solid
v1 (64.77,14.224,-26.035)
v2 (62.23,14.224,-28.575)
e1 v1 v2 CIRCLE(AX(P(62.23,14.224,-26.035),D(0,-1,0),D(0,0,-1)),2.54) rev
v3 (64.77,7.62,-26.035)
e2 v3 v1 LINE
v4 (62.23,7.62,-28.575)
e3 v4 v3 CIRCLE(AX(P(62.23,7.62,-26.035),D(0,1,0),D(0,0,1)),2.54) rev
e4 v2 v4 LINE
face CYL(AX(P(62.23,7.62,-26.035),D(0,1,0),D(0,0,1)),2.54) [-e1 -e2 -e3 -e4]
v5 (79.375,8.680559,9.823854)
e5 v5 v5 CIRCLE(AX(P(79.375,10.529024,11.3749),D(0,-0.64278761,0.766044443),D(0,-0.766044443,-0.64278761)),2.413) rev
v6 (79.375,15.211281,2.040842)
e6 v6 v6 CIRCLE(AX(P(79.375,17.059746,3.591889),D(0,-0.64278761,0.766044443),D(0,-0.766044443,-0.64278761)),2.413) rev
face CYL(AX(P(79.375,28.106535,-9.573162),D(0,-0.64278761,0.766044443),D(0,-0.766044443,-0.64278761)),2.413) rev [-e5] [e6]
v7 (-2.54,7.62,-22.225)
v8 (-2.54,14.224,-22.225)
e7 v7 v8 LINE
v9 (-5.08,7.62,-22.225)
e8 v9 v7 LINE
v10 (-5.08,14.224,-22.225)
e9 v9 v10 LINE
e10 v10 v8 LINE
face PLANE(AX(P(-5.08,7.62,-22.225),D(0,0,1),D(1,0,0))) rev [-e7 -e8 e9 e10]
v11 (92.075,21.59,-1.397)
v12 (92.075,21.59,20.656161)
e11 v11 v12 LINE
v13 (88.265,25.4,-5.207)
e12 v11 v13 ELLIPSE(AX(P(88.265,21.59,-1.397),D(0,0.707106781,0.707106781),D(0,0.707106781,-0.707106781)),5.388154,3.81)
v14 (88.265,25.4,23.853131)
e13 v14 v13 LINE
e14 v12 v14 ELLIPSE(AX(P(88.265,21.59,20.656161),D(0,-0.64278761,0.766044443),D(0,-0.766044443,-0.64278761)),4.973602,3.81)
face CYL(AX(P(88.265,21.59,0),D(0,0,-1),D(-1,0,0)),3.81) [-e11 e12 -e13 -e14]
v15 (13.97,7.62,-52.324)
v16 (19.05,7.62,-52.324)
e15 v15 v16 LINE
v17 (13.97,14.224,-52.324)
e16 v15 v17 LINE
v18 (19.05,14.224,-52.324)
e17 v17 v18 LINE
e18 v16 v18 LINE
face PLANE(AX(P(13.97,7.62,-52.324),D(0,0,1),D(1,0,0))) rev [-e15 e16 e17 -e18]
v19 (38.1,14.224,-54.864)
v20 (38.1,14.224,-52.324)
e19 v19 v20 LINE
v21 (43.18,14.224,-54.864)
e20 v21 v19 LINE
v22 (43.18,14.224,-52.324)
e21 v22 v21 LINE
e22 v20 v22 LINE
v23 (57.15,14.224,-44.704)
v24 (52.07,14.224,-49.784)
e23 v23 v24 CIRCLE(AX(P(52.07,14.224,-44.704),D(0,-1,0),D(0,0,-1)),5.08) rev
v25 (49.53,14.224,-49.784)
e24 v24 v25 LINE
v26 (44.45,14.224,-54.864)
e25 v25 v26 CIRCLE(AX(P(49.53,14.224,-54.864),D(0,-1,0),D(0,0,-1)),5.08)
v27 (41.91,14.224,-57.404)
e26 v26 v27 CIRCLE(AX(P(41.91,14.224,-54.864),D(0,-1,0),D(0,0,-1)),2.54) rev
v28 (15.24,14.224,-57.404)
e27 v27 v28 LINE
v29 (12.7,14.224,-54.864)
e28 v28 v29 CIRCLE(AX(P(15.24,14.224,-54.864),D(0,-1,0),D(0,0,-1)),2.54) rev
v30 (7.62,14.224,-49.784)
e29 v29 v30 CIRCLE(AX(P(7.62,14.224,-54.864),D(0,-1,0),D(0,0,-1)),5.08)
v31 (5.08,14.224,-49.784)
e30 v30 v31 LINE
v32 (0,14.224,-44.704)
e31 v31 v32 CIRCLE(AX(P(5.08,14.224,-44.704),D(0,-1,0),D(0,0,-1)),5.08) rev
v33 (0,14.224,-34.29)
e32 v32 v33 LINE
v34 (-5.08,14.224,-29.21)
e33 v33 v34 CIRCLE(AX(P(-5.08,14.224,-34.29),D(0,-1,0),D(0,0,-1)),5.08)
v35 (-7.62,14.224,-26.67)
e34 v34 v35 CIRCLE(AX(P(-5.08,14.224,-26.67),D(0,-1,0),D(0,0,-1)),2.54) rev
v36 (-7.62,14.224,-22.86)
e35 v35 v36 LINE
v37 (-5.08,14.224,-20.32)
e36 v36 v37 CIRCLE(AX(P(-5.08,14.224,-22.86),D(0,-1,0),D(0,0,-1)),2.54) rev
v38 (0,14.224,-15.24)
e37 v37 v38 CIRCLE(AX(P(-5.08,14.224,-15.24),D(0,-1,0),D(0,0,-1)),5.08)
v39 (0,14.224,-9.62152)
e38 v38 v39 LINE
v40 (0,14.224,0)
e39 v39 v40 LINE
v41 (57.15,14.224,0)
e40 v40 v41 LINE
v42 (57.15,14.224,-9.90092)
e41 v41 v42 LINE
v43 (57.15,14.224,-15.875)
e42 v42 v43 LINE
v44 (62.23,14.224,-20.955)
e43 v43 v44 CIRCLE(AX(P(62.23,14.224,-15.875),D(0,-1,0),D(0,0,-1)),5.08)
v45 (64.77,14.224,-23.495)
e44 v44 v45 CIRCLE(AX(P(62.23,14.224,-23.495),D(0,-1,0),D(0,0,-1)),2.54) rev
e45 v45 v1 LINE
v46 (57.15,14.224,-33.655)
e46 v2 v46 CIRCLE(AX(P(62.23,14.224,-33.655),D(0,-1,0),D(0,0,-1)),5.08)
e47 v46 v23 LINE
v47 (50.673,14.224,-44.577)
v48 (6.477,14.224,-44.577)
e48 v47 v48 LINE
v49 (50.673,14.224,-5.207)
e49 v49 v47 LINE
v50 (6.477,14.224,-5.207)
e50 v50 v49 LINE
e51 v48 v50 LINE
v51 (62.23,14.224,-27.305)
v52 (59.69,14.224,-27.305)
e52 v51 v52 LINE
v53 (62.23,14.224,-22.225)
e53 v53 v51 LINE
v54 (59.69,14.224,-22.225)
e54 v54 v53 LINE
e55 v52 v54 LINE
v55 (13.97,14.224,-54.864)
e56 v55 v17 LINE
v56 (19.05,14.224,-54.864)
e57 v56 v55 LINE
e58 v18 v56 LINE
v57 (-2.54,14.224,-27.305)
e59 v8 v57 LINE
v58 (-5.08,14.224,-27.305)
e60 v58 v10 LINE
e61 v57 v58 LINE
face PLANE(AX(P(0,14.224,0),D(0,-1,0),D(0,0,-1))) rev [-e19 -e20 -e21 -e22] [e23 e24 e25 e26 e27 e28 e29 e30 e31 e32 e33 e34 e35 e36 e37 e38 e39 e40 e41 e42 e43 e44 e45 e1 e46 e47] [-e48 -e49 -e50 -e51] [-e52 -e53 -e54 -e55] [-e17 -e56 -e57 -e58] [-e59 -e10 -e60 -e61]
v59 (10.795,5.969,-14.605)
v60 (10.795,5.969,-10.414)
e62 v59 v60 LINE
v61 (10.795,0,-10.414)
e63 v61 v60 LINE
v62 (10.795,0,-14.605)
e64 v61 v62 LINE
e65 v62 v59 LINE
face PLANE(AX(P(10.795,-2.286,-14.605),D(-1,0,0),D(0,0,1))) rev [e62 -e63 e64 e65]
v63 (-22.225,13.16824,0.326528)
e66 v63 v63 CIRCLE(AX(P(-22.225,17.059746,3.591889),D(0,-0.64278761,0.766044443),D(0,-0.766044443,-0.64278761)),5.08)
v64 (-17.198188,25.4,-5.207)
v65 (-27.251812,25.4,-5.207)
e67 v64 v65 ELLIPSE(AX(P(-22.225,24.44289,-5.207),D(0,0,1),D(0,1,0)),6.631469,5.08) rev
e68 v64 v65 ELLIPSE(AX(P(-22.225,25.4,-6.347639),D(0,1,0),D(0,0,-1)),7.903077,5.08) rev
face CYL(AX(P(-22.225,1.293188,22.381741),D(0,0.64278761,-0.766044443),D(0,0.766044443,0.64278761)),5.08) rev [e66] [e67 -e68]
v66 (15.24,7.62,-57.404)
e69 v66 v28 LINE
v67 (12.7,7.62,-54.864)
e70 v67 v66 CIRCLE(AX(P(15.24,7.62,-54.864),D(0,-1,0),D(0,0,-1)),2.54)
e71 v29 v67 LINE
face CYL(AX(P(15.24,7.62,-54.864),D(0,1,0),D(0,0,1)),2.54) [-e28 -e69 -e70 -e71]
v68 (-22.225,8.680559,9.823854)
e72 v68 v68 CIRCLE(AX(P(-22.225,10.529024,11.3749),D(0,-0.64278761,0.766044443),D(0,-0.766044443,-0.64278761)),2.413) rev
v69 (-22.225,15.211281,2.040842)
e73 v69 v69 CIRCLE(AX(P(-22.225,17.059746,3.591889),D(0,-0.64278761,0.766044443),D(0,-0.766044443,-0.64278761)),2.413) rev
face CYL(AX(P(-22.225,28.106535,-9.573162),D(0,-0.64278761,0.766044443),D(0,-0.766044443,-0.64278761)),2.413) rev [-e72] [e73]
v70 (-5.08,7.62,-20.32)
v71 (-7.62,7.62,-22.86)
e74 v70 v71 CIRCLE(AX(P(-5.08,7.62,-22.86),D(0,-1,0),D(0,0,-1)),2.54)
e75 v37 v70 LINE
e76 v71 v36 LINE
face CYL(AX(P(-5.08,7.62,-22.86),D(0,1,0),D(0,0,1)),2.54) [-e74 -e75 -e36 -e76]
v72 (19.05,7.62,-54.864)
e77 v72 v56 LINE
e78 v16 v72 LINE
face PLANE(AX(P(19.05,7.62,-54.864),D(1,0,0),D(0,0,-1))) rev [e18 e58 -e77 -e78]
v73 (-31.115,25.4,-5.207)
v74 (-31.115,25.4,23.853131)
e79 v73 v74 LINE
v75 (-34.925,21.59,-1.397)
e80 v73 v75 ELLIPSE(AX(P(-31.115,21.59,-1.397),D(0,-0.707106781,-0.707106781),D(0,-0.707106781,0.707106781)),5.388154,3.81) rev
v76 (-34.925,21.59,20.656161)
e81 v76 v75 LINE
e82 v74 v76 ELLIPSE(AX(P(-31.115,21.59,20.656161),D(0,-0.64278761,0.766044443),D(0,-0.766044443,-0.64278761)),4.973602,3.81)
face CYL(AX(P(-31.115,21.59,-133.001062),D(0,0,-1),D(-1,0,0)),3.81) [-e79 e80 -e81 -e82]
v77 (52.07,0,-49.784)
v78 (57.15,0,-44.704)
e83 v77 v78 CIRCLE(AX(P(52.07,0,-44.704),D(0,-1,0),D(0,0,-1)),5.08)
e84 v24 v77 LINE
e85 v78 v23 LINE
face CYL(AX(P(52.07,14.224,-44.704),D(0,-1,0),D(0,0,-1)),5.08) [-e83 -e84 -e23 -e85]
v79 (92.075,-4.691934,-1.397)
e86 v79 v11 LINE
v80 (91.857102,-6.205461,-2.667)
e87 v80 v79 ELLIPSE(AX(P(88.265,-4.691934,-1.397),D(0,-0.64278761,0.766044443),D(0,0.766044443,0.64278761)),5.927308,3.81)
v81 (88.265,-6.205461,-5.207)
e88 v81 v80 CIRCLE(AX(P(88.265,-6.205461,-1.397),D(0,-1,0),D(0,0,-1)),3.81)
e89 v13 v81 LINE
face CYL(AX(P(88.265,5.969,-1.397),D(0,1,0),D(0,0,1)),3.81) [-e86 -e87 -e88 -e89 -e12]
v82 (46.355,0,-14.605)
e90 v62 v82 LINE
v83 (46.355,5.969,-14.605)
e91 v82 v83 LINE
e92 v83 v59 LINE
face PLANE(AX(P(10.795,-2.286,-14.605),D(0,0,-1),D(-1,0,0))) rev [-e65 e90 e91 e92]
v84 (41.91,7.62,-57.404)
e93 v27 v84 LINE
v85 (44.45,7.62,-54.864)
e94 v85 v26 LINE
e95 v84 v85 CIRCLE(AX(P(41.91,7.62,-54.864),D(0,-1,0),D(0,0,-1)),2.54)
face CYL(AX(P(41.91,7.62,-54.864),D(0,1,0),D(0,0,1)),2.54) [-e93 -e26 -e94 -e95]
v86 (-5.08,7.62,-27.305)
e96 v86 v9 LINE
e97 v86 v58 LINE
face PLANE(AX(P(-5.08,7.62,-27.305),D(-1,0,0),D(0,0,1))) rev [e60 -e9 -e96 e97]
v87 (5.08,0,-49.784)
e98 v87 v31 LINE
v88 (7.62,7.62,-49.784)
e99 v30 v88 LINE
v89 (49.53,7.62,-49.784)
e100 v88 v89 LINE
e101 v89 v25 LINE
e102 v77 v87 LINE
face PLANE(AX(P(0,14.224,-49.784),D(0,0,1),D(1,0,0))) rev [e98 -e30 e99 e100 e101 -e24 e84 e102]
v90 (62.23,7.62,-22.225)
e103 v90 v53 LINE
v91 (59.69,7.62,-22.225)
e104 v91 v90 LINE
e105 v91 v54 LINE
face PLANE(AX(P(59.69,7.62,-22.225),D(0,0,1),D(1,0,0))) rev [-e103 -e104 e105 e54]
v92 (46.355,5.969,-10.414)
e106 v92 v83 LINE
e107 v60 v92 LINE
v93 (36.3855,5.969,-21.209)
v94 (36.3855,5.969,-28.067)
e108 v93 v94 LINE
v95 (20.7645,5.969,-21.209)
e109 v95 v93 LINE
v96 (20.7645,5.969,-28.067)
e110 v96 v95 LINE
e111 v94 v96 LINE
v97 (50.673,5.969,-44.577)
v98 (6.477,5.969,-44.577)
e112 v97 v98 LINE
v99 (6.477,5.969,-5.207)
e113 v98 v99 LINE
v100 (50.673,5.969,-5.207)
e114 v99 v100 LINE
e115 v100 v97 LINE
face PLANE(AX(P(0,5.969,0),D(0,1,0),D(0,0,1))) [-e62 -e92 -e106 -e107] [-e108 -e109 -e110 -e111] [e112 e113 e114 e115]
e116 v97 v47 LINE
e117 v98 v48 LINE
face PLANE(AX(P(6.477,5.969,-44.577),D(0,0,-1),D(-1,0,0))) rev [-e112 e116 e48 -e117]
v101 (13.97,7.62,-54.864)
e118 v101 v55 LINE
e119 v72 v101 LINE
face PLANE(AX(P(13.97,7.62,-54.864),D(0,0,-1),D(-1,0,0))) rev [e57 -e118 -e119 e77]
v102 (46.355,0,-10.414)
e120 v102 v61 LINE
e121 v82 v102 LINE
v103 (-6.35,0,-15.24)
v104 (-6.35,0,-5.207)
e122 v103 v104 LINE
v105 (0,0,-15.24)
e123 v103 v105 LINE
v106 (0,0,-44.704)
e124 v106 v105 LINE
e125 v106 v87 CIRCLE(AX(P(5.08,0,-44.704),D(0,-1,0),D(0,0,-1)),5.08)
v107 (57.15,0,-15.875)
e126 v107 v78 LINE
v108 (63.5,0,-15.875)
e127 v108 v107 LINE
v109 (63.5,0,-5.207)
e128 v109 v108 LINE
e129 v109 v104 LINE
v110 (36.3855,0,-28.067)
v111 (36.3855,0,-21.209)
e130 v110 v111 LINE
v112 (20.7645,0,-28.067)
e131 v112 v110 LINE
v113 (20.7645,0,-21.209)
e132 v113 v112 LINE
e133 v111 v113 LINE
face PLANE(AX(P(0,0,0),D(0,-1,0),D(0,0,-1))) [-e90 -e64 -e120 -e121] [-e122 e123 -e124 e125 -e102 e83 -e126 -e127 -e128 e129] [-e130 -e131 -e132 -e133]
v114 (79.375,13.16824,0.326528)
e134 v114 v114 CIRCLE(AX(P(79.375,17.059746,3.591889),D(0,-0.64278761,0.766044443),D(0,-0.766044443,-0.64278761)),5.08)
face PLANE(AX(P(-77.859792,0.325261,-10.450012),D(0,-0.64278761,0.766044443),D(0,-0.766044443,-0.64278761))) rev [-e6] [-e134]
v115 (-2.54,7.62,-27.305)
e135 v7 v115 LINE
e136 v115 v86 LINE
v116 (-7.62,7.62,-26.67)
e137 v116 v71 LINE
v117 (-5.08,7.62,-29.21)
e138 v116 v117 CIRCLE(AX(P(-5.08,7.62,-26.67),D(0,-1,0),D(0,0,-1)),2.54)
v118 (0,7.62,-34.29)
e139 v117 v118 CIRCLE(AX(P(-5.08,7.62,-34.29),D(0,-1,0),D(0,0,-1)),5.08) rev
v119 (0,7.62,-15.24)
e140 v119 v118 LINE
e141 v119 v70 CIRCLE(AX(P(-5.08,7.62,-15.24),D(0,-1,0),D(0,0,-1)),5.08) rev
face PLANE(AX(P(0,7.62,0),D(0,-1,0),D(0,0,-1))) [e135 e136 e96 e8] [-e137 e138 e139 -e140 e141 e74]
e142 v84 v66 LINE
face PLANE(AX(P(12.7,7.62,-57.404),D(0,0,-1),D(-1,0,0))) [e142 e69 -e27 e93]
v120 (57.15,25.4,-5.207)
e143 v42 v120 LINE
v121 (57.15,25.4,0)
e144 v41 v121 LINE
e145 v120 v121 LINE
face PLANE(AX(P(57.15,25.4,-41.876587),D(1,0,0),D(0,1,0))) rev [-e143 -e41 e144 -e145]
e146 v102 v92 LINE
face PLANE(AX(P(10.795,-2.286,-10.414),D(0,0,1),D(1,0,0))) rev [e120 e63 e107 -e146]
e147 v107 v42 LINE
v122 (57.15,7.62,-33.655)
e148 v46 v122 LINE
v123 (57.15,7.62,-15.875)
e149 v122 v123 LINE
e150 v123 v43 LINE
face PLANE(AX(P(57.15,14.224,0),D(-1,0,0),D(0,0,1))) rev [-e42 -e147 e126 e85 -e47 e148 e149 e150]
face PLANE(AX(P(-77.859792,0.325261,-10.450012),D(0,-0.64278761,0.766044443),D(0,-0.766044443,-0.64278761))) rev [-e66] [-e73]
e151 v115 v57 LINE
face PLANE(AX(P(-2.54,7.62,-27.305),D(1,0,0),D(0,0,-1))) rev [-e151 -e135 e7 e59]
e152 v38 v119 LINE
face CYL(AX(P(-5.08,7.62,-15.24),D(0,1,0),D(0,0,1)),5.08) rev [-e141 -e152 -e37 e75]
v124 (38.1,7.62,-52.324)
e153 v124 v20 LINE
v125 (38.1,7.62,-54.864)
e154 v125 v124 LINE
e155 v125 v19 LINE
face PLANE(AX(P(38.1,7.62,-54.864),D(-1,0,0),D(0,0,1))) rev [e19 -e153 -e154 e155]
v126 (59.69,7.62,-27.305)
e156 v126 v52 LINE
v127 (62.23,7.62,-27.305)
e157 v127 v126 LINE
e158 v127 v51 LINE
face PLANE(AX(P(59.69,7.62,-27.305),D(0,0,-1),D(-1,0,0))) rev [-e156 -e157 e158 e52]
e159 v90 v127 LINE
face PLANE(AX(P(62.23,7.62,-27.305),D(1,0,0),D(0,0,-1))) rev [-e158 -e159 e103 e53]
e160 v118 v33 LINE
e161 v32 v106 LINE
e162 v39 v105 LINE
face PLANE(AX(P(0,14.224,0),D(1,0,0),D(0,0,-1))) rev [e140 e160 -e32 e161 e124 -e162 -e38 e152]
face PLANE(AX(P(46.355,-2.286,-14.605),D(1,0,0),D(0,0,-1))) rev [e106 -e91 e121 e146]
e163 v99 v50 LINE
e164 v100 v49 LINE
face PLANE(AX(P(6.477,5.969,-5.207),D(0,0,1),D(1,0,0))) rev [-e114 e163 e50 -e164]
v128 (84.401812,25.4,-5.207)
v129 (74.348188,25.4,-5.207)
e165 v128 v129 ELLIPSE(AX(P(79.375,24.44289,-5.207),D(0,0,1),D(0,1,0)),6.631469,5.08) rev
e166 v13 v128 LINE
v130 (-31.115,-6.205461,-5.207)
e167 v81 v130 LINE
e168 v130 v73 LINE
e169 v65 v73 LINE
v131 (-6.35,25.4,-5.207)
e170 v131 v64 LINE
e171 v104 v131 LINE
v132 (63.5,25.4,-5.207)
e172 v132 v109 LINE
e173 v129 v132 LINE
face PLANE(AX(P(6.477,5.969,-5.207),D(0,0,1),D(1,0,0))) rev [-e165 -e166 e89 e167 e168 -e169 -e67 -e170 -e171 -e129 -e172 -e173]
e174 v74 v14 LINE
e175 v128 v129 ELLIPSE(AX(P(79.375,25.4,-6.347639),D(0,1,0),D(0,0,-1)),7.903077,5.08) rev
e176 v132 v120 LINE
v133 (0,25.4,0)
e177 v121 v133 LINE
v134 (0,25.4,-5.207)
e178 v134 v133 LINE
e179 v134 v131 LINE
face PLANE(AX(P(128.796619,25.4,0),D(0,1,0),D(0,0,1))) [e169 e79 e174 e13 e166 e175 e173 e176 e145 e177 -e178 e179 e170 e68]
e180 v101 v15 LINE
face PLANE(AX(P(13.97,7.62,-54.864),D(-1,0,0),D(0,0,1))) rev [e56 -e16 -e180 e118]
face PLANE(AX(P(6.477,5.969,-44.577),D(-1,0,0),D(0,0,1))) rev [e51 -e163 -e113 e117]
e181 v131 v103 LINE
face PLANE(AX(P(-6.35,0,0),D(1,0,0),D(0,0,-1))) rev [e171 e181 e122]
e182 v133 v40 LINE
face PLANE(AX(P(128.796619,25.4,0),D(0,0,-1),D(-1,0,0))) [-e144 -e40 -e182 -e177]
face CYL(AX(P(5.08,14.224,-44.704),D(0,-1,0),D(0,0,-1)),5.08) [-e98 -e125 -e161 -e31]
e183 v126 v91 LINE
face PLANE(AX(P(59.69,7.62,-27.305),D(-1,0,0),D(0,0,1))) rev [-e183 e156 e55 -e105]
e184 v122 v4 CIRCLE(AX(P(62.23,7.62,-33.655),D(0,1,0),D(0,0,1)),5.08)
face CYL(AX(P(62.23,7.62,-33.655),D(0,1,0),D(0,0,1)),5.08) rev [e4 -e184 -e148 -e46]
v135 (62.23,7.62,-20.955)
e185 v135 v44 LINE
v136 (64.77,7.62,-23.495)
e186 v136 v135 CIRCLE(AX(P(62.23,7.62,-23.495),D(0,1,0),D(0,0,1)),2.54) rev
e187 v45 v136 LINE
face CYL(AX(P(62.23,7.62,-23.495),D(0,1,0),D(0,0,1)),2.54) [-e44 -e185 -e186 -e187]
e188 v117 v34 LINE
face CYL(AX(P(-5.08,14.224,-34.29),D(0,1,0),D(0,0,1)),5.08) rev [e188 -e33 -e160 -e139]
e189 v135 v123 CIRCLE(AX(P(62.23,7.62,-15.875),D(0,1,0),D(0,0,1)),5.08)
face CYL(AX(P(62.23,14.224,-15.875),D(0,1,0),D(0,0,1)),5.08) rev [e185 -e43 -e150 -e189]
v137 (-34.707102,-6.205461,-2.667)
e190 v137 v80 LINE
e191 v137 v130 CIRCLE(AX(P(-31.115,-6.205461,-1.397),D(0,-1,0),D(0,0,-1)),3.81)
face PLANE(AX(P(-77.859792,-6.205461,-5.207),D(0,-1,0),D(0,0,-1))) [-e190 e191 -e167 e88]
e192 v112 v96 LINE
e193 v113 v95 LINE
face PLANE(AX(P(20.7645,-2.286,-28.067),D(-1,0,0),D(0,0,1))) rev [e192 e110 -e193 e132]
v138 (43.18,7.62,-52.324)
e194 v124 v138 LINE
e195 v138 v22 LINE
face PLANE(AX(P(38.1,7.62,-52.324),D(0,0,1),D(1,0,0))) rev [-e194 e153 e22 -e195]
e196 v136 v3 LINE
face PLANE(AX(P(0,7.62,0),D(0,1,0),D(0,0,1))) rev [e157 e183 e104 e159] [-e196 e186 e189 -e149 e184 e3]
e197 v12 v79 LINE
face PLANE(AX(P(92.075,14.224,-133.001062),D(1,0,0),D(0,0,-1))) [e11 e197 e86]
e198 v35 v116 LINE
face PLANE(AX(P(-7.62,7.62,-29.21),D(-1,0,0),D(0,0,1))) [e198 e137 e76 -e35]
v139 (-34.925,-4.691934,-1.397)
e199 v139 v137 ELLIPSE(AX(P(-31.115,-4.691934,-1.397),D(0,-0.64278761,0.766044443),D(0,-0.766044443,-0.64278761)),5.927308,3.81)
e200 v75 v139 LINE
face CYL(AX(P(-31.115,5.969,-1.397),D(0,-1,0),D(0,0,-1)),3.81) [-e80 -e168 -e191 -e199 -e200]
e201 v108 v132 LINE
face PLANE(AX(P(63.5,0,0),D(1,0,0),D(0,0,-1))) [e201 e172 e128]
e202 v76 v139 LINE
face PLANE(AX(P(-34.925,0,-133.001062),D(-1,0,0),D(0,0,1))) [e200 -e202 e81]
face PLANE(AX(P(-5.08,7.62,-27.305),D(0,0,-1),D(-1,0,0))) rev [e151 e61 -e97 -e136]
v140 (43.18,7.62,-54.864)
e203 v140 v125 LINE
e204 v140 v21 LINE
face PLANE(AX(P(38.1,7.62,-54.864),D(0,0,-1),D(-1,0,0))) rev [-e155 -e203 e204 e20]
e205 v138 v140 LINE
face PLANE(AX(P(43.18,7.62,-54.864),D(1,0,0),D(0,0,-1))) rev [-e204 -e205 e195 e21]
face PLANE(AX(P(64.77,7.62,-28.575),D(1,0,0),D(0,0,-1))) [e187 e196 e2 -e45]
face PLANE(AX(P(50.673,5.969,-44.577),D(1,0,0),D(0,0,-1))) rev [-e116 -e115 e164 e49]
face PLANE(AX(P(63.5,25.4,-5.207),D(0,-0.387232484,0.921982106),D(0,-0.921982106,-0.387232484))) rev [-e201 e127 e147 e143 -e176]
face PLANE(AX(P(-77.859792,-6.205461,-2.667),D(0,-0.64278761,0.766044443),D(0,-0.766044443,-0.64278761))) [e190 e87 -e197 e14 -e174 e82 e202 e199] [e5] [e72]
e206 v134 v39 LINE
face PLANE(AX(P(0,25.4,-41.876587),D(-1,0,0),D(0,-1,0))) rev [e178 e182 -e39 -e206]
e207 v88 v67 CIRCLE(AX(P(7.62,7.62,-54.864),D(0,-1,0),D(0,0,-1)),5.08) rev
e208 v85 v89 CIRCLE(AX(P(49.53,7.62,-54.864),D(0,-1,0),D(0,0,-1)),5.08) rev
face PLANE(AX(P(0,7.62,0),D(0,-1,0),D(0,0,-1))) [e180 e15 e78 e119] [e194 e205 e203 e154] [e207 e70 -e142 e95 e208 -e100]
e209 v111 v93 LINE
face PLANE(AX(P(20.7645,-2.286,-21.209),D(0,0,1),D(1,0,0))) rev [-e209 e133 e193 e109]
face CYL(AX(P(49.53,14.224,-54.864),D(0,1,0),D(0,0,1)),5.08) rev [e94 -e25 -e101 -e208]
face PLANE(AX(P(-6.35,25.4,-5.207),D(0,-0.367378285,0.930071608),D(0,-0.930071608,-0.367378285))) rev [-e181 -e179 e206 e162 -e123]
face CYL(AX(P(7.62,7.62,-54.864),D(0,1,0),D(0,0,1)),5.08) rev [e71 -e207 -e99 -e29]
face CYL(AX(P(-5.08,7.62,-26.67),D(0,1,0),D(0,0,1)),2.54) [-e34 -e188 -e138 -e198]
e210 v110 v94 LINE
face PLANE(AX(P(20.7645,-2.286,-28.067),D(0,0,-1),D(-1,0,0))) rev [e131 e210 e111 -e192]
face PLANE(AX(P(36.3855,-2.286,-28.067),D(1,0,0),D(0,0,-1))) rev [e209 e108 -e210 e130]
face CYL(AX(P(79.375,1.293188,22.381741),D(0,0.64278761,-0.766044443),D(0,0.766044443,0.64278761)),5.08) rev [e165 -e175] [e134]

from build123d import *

# Parameters (mm, degrees)
SKETCH2_W           = 57.15
SKETCH2_H           = 49.784
BOSS_EXTRUDE1_DEPTH = 14.224
SKETCH3_W           = 44.196
SKETCH3_H           = 39.37
CUT_EXTRUDE1_DEPTH  = 8.255
SKETCH4_W           = 35.56
SKETCH4_H           = 4.191
SKETCH4_W_2         = 15.621
SKETCH4_H_2         = 6.858
CUT_EXTRUDE2_DEPTH  = 8.255
SKETCH5_W           = 7.62
SKETCH5_H           = 8.89
SKETCH5_H_2         = 7.62
BOSS_EXTRUDE2_DEPTH = 6.604
SKETCH6_W           = 2.54
SKETCH6_H           = 5.08
SKETCH6_W_2         = 5.08
SKETCH6_H_2         = 2.54
CUT_EXTRUDE3_DEPTH  = 6.604
FILLET1_R           = 5.08
FILLET2_R           = 2.54
SKETCH7_W           = 127
SKETCH7_H           = 14.224
SKETCH7_R           = 2.38125
BOSS_EXTRUDE3_DEPTH = 5.207
BOSS_EXTRUDE4_DEPTH = 127
SKETCH11_W          = 34.925
SKETCH11_H          = 11.176
BOSS_EXTRUDE5_DEPTH = 5.207
SKETCH9_R           = 2.413
CUT_EXTRUDE4_DEPTH  = 25.4
FILLET3_R           = 5.08
FILLET4_R           = 5.08
BOSS_EXTRUDE6_DEPTH = 6.35
BOSS_EXTRUDE7_DEPTH = 6.35
BOSS_EXTRUDE8_DEPTH = 127
BOSS_EXTRUDE9_DEPTH = 127
CUT_EXTRUDE6_START  = -1.945752886
SKETCH16_R          = 2.413
CUT_EXTRUDE6_DEPTH  = 1.945752886
CUT_EXTRUDE9_START  = -22.261352
SKETCH17_R          = 5.08
CUT_EXTRUDE9_DEPTH  = 12.101352
FILLET5_R           = 3.81


with BuildPart() as part:
    # Sketch2 → Boss-Extrude1 (new body)
    with BuildSketch(Plane(origin=(0, 0, 0), x_dir=(1, 0, 0), z_dir=(0, 1, 0))):
        with Locations((28.575, 24.892)):
            Rectangle(SKETCH2_W, SKETCH2_H)
    extrude(amount=BOSS_EXTRUDE1_DEPTH)

    # Sketch3 → Cut-Extrude1 (cut)
    with BuildSketch(Plane(origin=(0, 14.224, 0), x_dir=(1, 0, 0), z_dir=(0, 1, 0))):
        with Locations((28.575, 24.892)):
            Rectangle(SKETCH3_W, SKETCH3_H)
    extrude(amount=-CUT_EXTRUDE1_DEPTH, mode=Mode.SUBTRACT)

    # Sketch4 → Cut-Extrude2 (cut)
    with BuildSketch(Plane(origin=(0, 5.969, 0), x_dir=(1, 0, 0), z_dir=(0, 1, 0))):
        with Locations((28.575, 12.5095)):
            Rectangle(SKETCH4_W, SKETCH4_H)
        with Locations((28.575, 24.638)):
            Rectangle(SKETCH4_W_2, SKETCH4_H_2)
    extrude(amount=-CUT_EXTRUDE2_DEPTH, mode=Mode.SUBTRACT)

    # Sketch5 → Boss-Extrude2 (add)
    with BuildSketch(Plane(origin=(0, 14.224, 0), x_dir=(1, 0, 0), z_dir=(0, 1, 0))):
        with Locations((-3.81, 24.765)):
            Rectangle(SKETCH5_W, SKETCH5_H)
        Polygon((12.7, 49.784), (36.83, 49.784), (44.45, 49.784), (44.45, 57.404), (36.83, 57.404), (12.7, 57.404), align=None)
        with Locations((60.96, 24.765)):
            Rectangle(SKETCH5_W, SKETCH5_H_2)
    extrude(amount=-BOSS_EXTRUDE2_DEPTH)

    # Sketch6 → Cut-Extrude3 (cut)
    with BuildSketch(Plane(origin=(0, 14.224, 0), x_dir=(1, 0, 0), z_dir=(0, 1, 0))):
        with Locations((-3.81, 24.765)):
            Rectangle(SKETCH6_W, SKETCH6_H)
        with Locations((60.96, 24.765)):
            Rectangle(SKETCH6_W, SKETCH6_H)
        with Locations((16.51, 53.594)):
            Rectangle(SKETCH6_W_2, SKETCH6_H_2)
        with Locations((40.64, 53.594)):
            Rectangle(SKETCH6_W_2, SKETCH6_H_2)
    extrude(amount=-CUT_EXTRUDE3_DEPTH, mode=Mode.SUBTRACT)

    # Fillet1
    fillet1_edges = [part.edges().sort_by_distance(p)[0] for p in [
        (0, 7.112, -49.784),
        (57.15, 7.112, -49.784),
        (57.15, 7.112, 0),
        (0, 7.112, 0),
    ]]
    fillet(fillet1_edges, radius=FILLET1_R)

    # Fillet2
    fillet2_edges = [part.edges().sort_by_distance(p)[0] for p in [
        (-7.62, 10.922, -20.32),
        (-7.62, 10.922, -29.21),
        (12.7, 10.922, -57.404),
        (44.45, 10.922, -57.404),
        (64.77, 10.922, -28.575),
        (64.77, 10.922, -20.955),
    ]]
    fillet(fillet2_edges, radius=FILLET2_R)

    # Sketch7 → Boss-Extrude3 (add)
    with BuildSketch(Plane.XY):
        with Locations((28.575, 7.112)):
            Rectangle(SKETCH7_W, SKETCH7_H)
        with Locations((-30.861, 7.112)):
            Circle(SKETCH7_R, mode=Mode.SUBTRACT)
        with Locations((88.011, 7.112)):
            Circle(SKETCH7_R, mode=Mode.SUBTRACT)
    extrude(amount=-BOSS_EXTRUDE3_DEPTH)

    # Sketch8 → Boss-Extrude4 (add)
    with BuildSketch(Plane.ZY.offset(34.925)):
        Polygon((0, 25.4), (21.313130632, 25.4), (0, 0), (-5.207, 0), (-5.207, 14.224), (0, 14.224), align=None)
    extrude(amount=-BOSS_EXTRUDE4_DEPTH)

    # Sketch11 → Boss-Extrude5 (add)
    with BuildSketch(Plane(origin=(0, 0, 0), x_dir=(-1, 0, 0), z_dir=(0, 0, -1))):
        with Locations((17.4625, 19.812)):
            Rectangle(SKETCH11_W, SKETCH11_H)
        with Locations((-74.6125, 19.812)):
            Rectangle(SKETCH11_W, SKETCH11_H)
    extrude(amount=BOSS_EXTRUDE5_DEPTH)

    # Sketch9 → Cut-Extrude4 (cut, symmetric)
    with BuildSketch(Plane(origin=(0, 0, 0), x_dir=(1, 0, 0), z_dir=(0, -0.6427876096865434, 0.7660444431189748))):
        with Locations(Location((-22.225, 15.377345149, 0), (0, 0, 270))):
            Circle(SKETCH9_R)
        with Locations(Location((79.375, 15.377345149, 0), (0, 0, 270))):
            Circle(SKETCH9_R)
    extrude(amount=CUT_EXTRUDE4_DEPTH, both=True, mode=Mode.SUBTRACT)

    # Fillet3
    fillet3_edges = [part.edges().sort_by_distance(p)[0] for p in [
        (44.45, 10.922, -49.784),
        (12.7, 10.922, -49.784),
    ]]
    fillet(fillet3_edges, radius=FILLET3_R - 0.0001)  # a hair under: the kernel refuses the full size

    # Fillet4
    fillet4_edges = [part.edges().sort_by_distance(p)[0] for p in [
        (57.15, 10.922, -20.955),
        (57.15, 10.922, -28.575),
        (0, 10.922, -29.21),
        (0, 10.922, -20.32),
    ]]
    fillet(fillet4_edges, radius=FILLET4_R - 0.0001)  # a hair under: the kernel refuses the full size

    # Sketch12 → Boss-Extrude6 (add)
    with BuildSketch(Plane.ZY):
        Polygon((-5.207, 25.4), (-15.24, 0), (-5.207, 0), align=None)
    extrude(amount=BOSS_EXTRUDE6_DEPTH)

    # Sketch13 → Boss-Extrude7 (add)
    with BuildSketch(Plane(origin=(57.15, 0, 0), x_dir=(0, 0, -1), z_dir=(1, 0, 0))):
        Polygon((5.207, 25.4), (15.875, 0), (5.207, 0), align=None)
    extrude(amount=BOSS_EXTRUDE7_DEPTH)

    # Sketch14 → Boss-Extrude8 (add)
    with BuildSketch(Plane.ZY.offset(34.925)):
        Polygon((-5.207, 0), (-5.207, -6.205460957), (0, 0), align=None)
    extrude(amount=-BOSS_EXTRUDE8_DEPTH)

    # Sketch15 → Boss-Extrude9 (add)
    with BuildSketch(Plane(origin=(92.075, 0, 0), x_dir=(0, 0, -1), z_dir=(1, 0, 0))):
        Polygon((5.207, -6.205460957), (2.667, -6.205460957), (-23.853130632, 25.4), (-21.313130632, 25.4), align=None)
    extrude(amount=-BOSS_EXTRUDE9_DEPTH)

    # Sketch16 → Cut-Extrude6 (cut)
    with BuildSketch(Plane(origin=(0, 0, 0), x_dir=(-1, 0, 0), z_dir=(0, 0.6427876096865434, -0.7660444431189748)).offset(CUT_EXTRUDE6_START)):
        with Locations(Location((-79.375, 15.377345149, 0), (0, 0, 270))):
            Circle(SKETCH16_R)
        with Locations(Location((22.225, 15.377345149, 0), (0, 0, 270))):
            Circle(SKETCH16_R)
    extrude(amount=CUT_EXTRUDE6_DEPTH, mode=Mode.SUBTRACT)

    # Sketch17 → Cut-Extrude9 (cut)
    with BuildSketch(Plane(origin=(0, -1.250705846, 1.490533186), x_dir=(1, 0, 0), z_dir=(0, -0.6427876096865434, 0.7660444431189747)).offset(CUT_EXTRUDE9_START)):
        with Locations(Location((79.375, 15.377345149, 0), (0, 0, 171.701605742))):
            Circle(SKETCH17_R)
        with Locations(Location((-22.225, 15.377345149, 0), (0, 0, 8.298394258))):
            Circle(SKETCH17_R)
    extrude(amount=CUT_EXTRUDE9_DEPTH, mode=Mode.SUBTRACT)

    # Fillet5
    fillet5_edges = [part.edges().sort_by_distance(p)[0] for p in [
        (-34.925, 25.4, 9.323065316),
        (92.075, 25.4, 9.323065316),
        (92.075, 9.597269522, -5.207),
        (-34.925, 9.597269522, -5.207),
    ]]
    fillet(fillet5_edges, radius=FILLET5_R)


solid = part.part
